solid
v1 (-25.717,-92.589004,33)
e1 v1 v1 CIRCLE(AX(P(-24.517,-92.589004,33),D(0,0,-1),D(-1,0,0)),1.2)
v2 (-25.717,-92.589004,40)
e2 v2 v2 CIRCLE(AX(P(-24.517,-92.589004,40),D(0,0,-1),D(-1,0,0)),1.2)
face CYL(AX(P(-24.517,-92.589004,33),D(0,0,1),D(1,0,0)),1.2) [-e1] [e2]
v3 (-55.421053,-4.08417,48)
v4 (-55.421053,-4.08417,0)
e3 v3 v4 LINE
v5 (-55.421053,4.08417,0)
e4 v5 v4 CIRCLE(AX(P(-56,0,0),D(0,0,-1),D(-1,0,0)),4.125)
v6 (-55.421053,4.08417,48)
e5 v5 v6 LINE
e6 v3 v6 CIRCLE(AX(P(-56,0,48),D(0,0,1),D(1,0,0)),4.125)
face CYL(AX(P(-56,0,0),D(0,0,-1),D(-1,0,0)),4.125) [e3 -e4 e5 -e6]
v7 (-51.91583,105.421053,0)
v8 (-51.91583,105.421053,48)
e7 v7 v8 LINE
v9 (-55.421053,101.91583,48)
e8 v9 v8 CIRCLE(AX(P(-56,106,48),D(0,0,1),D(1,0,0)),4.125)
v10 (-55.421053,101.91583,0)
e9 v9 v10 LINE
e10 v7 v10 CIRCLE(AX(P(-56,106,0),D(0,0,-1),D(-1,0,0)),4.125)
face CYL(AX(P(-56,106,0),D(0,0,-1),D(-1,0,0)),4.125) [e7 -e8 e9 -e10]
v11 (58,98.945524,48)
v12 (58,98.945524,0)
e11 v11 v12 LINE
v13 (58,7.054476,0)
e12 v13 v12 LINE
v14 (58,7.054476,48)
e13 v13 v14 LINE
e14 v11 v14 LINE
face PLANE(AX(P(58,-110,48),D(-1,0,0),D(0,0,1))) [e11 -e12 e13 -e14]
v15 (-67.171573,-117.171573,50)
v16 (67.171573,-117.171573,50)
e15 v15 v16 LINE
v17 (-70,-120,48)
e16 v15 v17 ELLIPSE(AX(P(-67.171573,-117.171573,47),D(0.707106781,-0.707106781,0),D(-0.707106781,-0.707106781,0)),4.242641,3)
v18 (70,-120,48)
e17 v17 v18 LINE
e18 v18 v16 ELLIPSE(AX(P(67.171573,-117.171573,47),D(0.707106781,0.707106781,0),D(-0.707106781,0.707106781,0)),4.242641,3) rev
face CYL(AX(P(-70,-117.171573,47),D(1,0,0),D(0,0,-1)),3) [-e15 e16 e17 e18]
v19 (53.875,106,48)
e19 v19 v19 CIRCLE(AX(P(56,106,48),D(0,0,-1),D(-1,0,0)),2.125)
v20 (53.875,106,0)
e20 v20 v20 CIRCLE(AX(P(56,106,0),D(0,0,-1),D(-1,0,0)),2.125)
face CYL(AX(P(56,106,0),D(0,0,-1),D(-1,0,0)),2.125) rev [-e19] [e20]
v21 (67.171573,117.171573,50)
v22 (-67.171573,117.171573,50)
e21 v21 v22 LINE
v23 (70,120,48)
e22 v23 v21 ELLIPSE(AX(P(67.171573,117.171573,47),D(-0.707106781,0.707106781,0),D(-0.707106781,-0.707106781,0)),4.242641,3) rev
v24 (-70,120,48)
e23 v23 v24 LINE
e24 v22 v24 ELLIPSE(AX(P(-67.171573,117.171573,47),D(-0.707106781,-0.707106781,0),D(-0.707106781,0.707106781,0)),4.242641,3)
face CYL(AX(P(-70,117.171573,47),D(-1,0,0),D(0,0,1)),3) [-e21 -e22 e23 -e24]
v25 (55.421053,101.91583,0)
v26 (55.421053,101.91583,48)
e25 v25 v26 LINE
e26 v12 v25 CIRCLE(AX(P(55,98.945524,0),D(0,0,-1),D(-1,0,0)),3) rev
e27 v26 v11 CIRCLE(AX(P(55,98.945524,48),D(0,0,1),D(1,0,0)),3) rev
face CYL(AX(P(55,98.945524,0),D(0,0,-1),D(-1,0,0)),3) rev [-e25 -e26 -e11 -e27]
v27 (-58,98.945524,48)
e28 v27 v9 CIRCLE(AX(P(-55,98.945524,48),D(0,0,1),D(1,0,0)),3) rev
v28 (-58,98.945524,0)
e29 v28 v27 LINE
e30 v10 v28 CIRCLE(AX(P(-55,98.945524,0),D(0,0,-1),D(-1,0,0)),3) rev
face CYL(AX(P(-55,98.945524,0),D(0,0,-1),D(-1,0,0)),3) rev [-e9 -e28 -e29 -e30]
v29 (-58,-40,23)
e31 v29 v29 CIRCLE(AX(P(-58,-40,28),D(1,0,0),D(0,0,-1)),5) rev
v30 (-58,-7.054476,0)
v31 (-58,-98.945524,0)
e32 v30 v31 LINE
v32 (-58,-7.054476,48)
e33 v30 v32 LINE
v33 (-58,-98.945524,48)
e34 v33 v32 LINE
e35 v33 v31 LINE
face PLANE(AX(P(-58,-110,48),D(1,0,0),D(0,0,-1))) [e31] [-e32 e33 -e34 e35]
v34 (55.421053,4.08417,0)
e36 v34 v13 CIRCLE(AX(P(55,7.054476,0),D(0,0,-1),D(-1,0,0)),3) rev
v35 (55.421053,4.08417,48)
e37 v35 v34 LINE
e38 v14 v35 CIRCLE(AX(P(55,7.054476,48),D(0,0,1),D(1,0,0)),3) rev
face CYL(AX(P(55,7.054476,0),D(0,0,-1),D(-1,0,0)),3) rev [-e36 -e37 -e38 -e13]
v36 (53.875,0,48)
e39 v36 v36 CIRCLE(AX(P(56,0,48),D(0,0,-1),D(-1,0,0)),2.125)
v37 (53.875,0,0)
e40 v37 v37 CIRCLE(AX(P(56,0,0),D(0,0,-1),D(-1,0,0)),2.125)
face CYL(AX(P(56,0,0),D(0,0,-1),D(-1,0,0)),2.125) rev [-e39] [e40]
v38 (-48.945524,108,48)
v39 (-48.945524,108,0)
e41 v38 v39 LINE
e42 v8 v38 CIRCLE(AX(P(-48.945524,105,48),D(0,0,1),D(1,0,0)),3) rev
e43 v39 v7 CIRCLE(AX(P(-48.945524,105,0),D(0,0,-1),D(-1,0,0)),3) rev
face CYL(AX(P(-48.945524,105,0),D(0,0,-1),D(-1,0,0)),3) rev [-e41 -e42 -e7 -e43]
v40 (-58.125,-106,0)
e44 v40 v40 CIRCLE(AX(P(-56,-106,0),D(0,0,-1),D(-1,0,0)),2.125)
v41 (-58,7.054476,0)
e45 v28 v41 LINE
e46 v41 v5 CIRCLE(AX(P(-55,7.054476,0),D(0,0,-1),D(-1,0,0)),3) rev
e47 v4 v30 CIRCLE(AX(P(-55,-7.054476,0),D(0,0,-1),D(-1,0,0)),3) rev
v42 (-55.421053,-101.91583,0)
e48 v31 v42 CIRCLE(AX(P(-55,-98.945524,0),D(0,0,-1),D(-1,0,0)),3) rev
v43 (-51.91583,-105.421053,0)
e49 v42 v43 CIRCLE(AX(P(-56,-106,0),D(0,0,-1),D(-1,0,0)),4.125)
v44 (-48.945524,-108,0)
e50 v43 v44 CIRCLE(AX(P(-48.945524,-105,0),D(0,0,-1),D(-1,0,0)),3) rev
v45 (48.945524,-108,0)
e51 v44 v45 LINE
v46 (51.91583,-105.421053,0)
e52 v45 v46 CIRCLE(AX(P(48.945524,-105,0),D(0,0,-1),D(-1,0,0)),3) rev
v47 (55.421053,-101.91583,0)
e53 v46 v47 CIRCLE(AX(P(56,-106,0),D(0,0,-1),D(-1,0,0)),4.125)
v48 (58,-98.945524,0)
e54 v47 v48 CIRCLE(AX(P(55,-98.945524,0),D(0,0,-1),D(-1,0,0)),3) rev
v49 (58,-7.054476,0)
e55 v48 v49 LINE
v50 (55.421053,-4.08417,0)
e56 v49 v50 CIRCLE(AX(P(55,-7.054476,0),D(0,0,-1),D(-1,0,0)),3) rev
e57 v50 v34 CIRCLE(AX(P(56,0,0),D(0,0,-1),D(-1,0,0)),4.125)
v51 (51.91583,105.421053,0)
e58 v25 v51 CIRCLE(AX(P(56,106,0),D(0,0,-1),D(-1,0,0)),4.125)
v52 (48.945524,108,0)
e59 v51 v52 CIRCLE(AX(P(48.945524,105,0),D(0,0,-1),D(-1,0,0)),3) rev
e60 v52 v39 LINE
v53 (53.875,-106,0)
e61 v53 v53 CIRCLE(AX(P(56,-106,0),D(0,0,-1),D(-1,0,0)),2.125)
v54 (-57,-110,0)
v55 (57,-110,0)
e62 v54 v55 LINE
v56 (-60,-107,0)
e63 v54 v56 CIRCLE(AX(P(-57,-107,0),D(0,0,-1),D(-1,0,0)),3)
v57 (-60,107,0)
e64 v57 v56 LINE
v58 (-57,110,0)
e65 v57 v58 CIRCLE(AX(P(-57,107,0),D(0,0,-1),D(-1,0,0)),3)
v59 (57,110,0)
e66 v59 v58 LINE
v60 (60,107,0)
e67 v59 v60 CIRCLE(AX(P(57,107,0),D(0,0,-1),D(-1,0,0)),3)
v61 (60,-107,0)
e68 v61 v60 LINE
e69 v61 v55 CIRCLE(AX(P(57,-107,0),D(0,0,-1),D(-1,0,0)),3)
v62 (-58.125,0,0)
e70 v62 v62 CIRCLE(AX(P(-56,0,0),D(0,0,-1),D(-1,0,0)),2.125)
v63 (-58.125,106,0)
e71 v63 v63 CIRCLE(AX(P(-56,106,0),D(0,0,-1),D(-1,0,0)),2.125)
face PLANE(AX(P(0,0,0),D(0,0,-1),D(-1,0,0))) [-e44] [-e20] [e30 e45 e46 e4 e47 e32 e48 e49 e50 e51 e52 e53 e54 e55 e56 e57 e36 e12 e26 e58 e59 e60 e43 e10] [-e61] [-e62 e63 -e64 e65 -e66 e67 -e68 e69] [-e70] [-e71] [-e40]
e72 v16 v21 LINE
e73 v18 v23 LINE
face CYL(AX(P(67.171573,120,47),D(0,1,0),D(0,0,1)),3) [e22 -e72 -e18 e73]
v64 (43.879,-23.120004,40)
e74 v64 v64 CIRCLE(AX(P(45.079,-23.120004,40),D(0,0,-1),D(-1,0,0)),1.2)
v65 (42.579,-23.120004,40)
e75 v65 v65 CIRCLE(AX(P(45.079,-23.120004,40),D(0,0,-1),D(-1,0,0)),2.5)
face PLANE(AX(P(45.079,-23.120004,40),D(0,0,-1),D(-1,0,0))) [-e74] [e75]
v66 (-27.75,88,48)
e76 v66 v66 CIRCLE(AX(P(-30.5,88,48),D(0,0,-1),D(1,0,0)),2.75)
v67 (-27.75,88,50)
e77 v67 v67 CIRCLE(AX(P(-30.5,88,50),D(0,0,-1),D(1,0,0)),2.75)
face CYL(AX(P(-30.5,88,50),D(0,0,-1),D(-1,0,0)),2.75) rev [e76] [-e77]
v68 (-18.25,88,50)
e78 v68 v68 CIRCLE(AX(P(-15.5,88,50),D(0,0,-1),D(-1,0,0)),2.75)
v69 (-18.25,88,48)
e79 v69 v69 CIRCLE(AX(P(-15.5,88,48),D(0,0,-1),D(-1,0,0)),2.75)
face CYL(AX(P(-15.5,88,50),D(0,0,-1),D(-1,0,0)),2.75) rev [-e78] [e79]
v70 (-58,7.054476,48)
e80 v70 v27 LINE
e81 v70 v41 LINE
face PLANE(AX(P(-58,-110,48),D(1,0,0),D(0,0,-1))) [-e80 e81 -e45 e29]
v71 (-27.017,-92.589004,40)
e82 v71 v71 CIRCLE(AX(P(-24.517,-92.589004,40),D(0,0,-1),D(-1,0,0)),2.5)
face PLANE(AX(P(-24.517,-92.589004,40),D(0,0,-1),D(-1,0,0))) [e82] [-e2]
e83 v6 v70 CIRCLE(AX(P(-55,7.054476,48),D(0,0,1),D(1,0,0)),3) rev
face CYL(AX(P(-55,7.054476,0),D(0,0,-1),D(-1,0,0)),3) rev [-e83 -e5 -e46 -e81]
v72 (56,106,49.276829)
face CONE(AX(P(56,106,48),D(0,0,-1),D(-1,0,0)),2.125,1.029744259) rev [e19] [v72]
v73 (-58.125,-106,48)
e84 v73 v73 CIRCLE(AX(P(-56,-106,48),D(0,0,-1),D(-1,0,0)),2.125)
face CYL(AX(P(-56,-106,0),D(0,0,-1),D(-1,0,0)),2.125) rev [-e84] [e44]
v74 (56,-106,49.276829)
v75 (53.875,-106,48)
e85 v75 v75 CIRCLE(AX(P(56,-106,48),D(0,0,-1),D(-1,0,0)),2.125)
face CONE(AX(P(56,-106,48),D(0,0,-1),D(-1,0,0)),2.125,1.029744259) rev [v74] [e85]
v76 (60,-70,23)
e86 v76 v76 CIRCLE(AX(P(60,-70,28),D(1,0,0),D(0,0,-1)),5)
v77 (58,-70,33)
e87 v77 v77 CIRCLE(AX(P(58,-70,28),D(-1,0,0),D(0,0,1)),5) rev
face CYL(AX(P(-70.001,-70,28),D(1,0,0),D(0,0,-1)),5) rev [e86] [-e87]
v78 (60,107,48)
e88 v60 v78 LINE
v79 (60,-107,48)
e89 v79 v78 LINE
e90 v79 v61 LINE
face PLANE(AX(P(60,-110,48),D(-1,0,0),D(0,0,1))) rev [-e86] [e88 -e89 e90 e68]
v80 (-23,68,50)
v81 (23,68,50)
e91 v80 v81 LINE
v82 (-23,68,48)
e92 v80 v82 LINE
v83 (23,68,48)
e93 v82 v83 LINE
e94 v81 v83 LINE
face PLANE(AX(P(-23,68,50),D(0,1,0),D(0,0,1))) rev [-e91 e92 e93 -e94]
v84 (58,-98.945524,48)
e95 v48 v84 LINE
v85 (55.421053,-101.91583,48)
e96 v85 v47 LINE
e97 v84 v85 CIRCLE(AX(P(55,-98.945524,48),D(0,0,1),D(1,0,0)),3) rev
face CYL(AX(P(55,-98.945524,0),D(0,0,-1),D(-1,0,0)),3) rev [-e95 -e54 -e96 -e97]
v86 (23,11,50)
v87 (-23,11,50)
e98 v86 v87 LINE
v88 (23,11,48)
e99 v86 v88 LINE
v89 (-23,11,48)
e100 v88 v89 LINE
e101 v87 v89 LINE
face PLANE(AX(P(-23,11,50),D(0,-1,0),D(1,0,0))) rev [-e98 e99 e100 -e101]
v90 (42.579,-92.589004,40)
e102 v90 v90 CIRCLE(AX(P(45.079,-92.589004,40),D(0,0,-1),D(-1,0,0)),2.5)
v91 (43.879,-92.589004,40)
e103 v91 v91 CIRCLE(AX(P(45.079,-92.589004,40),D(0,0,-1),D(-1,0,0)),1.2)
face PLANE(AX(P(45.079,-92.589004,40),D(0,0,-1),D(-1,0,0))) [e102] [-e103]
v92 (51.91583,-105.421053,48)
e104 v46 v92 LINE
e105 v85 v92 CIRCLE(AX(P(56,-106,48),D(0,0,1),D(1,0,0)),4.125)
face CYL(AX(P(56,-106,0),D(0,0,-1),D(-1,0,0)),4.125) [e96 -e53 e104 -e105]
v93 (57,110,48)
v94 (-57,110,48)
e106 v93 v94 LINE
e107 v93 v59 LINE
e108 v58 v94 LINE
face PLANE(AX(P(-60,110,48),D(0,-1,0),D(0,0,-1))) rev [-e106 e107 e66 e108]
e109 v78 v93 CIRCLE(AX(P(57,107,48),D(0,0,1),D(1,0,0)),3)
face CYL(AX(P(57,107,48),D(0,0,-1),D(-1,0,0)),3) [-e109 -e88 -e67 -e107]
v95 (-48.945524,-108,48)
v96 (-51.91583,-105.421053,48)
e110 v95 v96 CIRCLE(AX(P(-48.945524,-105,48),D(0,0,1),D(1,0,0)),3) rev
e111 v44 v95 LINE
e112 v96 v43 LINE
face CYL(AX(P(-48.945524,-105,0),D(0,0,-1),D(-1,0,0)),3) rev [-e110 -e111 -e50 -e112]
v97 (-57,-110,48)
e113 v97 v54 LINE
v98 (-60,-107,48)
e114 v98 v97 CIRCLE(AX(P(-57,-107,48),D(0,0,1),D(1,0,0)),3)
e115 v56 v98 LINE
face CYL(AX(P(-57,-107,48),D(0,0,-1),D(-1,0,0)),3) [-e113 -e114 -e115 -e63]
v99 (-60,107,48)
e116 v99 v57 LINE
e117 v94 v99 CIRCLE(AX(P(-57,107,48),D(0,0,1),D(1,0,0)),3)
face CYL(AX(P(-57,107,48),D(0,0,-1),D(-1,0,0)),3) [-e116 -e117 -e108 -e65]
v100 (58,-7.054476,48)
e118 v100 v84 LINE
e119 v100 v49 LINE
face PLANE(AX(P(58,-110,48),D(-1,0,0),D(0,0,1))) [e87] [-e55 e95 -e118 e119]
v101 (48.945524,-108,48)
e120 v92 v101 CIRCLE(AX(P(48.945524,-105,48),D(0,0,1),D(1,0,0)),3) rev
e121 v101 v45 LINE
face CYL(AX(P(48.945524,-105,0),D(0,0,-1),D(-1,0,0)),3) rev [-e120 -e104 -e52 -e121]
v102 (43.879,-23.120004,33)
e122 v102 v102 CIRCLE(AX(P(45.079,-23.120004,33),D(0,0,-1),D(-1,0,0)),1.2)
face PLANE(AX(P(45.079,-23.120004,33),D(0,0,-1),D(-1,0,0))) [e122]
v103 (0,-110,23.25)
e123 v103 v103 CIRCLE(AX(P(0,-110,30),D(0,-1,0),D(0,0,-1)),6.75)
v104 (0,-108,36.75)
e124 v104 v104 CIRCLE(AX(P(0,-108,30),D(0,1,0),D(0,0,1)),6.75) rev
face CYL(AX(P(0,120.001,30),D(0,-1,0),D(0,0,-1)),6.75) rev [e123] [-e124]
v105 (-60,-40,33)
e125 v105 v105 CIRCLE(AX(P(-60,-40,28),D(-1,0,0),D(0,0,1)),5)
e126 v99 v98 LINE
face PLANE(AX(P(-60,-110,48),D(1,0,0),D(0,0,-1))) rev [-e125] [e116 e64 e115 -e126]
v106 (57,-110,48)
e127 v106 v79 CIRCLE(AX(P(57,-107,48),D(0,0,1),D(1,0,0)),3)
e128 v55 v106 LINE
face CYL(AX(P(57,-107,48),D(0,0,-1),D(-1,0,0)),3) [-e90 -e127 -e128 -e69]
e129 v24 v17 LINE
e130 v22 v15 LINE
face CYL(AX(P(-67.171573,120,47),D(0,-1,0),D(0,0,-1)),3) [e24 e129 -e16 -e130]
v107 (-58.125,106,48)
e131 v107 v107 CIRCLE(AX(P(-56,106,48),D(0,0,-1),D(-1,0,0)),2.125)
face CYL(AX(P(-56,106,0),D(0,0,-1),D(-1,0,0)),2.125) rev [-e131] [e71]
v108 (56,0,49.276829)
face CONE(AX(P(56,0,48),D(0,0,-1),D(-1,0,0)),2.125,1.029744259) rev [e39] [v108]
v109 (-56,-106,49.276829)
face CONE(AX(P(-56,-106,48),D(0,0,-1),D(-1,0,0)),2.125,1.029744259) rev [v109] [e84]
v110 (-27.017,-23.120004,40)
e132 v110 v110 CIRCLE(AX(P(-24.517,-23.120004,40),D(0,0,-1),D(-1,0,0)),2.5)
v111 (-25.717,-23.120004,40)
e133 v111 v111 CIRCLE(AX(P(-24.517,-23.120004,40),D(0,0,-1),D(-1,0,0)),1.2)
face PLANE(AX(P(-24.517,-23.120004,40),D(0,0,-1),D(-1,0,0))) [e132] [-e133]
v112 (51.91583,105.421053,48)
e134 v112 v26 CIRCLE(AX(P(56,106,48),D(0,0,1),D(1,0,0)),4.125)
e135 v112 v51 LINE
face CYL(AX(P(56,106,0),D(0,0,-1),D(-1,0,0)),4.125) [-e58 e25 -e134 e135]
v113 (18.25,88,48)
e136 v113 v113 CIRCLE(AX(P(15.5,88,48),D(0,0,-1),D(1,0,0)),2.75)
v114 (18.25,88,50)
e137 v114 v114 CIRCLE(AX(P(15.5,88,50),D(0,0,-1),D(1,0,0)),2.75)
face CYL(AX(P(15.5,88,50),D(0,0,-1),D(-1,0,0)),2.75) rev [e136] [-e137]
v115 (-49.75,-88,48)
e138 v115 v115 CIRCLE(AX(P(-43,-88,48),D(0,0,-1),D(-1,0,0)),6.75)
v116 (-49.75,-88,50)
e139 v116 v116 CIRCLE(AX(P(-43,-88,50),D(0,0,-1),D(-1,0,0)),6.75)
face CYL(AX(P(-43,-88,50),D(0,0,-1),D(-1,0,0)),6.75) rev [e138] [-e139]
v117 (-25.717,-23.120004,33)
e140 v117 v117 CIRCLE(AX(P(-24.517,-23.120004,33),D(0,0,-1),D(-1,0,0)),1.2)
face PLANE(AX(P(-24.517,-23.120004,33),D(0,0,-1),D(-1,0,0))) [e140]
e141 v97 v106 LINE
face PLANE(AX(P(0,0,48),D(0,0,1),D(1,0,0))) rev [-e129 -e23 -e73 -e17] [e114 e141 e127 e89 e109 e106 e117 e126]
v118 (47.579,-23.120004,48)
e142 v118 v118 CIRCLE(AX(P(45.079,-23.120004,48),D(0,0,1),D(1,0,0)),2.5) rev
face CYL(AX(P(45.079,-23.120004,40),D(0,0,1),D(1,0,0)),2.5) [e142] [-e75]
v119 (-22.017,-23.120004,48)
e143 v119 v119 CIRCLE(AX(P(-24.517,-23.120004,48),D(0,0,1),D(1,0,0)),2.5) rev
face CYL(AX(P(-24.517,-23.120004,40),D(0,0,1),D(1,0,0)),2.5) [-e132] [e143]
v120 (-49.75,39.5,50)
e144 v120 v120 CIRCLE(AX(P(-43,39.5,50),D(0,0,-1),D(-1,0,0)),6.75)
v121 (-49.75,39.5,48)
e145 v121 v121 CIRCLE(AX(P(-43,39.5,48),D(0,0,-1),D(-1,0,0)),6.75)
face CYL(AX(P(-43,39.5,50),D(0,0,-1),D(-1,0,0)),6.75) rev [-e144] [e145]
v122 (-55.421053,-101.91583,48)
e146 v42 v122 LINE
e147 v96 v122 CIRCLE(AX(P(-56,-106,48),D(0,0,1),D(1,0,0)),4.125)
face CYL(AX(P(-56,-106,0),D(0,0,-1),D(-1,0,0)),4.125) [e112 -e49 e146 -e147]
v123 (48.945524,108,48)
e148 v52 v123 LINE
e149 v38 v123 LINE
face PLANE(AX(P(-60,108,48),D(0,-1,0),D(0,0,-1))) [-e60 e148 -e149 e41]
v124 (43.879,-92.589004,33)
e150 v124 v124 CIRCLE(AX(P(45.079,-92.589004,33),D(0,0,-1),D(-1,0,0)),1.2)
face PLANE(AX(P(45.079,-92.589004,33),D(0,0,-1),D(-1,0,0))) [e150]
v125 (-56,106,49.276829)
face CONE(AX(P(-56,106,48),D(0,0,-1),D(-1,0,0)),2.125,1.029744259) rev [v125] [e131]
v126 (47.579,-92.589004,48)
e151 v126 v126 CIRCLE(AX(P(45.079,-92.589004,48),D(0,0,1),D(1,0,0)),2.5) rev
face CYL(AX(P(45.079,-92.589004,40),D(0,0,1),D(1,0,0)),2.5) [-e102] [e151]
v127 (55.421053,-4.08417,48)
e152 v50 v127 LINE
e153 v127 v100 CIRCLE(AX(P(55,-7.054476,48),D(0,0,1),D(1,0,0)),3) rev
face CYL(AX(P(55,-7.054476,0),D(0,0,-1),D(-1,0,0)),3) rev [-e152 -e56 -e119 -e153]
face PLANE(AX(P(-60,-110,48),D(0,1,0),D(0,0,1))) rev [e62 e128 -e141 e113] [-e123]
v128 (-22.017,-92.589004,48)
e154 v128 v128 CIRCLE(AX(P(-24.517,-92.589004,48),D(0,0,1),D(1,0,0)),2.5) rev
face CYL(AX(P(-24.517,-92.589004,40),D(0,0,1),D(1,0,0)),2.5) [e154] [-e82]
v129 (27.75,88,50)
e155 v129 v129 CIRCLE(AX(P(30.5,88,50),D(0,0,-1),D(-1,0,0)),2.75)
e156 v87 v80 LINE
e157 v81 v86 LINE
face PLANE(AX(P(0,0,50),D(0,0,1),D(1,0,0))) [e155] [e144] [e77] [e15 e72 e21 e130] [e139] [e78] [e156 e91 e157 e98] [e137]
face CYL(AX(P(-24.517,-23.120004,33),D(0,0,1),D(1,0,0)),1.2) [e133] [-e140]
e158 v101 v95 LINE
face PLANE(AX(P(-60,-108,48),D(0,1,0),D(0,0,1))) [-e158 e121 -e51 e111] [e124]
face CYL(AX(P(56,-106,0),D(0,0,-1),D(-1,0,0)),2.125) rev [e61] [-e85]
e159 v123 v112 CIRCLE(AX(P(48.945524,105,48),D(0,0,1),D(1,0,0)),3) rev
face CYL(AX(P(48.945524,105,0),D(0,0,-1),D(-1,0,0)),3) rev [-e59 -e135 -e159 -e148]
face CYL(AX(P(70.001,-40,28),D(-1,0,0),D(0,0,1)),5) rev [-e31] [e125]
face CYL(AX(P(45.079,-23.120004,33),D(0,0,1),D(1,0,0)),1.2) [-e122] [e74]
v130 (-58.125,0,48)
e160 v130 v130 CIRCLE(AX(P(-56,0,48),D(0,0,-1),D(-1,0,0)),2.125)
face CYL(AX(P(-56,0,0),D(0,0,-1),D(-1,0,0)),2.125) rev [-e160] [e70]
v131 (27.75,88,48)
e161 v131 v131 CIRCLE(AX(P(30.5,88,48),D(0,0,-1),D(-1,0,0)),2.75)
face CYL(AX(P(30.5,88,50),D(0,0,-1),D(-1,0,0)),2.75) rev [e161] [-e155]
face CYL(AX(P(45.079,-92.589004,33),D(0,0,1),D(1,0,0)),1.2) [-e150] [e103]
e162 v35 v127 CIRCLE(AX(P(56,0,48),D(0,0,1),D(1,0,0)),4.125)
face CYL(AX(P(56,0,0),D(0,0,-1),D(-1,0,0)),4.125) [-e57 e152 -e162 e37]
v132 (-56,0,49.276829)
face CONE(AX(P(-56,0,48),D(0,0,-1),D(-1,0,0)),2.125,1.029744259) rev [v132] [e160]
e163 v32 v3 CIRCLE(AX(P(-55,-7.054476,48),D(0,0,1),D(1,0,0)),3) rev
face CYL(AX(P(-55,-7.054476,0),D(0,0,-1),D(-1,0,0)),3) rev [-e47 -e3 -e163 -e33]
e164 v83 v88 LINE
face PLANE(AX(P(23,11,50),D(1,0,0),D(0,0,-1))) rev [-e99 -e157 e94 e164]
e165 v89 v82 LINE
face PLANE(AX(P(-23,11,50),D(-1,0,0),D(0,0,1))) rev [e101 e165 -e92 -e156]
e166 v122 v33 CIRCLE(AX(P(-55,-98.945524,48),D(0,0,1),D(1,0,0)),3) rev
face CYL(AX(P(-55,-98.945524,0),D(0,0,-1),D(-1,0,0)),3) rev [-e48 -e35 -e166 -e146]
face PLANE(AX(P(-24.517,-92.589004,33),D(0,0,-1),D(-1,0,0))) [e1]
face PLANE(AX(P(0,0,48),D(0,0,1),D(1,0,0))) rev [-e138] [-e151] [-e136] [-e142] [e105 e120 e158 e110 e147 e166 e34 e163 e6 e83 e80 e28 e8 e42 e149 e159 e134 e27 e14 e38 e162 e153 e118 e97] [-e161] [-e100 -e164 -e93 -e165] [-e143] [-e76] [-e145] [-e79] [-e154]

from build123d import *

# Parameters (mm, degrees)
SKETCH1_W           = 120
SKETCH1_H           = 220
BOSS_EXTRUDE1_DEPTH = 48
SKETCH2_W           = 140
SKETCH2_H           = 240
BOSS_EXTRUDE2_DEPTH = 2
SHELL3_DEPTH        = 48
FILLET1_R           = 3
SKETCH4_R           = 2.75
SKETCH4_R_2         = 6.75
SKETCH4_W           = 46
SKETCH4_H           = 57
CUT_EXTRUDE1_DEPTH  = 147.982992213
SKETCH6_R           = 1.2
BOSS_EXTRUDE3_DEPTH = 15
SKETCH7_R           = 2.5
BOSS_EXTRUDE4_DEPTH = 8
CUT_EXTRUDE2_REACH  = 185.848
SKETCH9_R           = 5
CUT_EXTRUDE3_REACH  = 185.848
SKETCH10_R          = 5
CUT_EXTRUDE4_REACH  = 247.561
SKETCH11_R          = 6.75
FILLET2_R           = 3
FILLET3_R           = 3


# Read off the part's stored shape, not the designer's step: Ø3.0mm Dowel Hole1, Shell3
with BuildPart() as part:
    # Sketch1 → Boss-Extrude1 (new body)
    with BuildSketch(Plane.XY):
        Rectangle(SKETCH1_W, SKETCH1_H)
    extrude(amount=BOSS_EXTRUDE1_DEPTH)

    # Sketch2 → Boss-Extrude2 (add)
    with BuildSketch(Plane.XY.offset(48)):
        Rectangle(SKETCH2_W, SKETCH2_H)
    extrude(amount=BOSS_EXTRUDE2_DEPTH)

    # Ø3.0mm Dowel Hole1 outline → Ø3.0mm Dowel Hole1 (revolve, cut)
    with BuildSketch(Plane(origin=(-56, 0, 0), x_dir=(1, 0, 0), z_dir=(0, -1, 0))):
        Polygon((2.125, 48), (0, 49.276828815), (0, 0), (2.125, 0), align=None)
    revolve(axis=Axis((-56, 0, 0), (0, 0, 1)), mode=Mode.SUBTRACT)

    # 3.0mm Dowel Hole1 2 outline → 3.0mm Dowel Hole1 2 (revolve, cut)
    with BuildSketch(Plane(origin=(56, 0, 0), x_dir=(1, 0, 0), z_dir=(0, -1, 0))):
        Polygon((2.125, 48), (0, 49.276828815), (0, 0), (2.125, 0), align=None)
    revolve(axis=Axis((56, 0, 0), (0, 0, 1)), mode=Mode.SUBTRACT)

    # 3.0mm Dowel Hole1 3 outline → 3.0mm Dowel Hole1 3 (revolve, cut)
    with BuildSketch(Plane(origin=(-56, -106, 0), x_dir=(1, 0, 0), z_dir=(0, -1, 0))):
        Polygon((2.125, 48), (0, 49.276828815), (0, 0), (2.125, 0), align=None)
    revolve(axis=Axis((-56, -106, 0), (0, 0, 1)), mode=Mode.SUBTRACT)

    # 3.0mm Dowel Hole1 4 outline → 3.0mm Dowel Hole1 4 (revolve, cut)
    with BuildSketch(Plane(origin=(56, -106, 0), x_dir=(1, 0, 0), z_dir=(0, -1, 0))):
        Polygon((2.125, 48), (0, 49.276828815), (0, 0), (2.125, 0), align=None)
    revolve(axis=Axis((56, -106, 0), (0, 0, 1)), mode=Mode.SUBTRACT)

    # 3.0mm Dowel Hole1 5 outline → 3.0mm Dowel Hole1 5 (revolve, cut)
    with BuildSketch(Plane(origin=(-56, 106, 0), x_dir=(1, 0, 0), z_dir=(0, -1, 0))):
        Polygon((2.125, 48), (0, 49.276828815), (0, 0), (2.125, 0), align=None)
    revolve(axis=Axis((-56, 106, 0), (0, 0, 1)), mode=Mode.SUBTRACT)

    # 3.0mm Dowel Hole1 6 outline → 3.0mm Dowel Hole1 6 (revolve, cut)
    with BuildSketch(Plane(origin=(56, 106, 0), x_dir=(1, 0, 0), z_dir=(0, -1, 0))):
        Polygon((2.125, 48), (0, 49.276828815), (0, 0), (2.125, 0), align=None)
    revolve(axis=Axis((56, 106, 0), (0, 0, 1)), mode=Mode.SUBTRACT)

    # Shell3 outline → Shell3 (cut)
    with BuildSketch(Plane.XY):
        with BuildLine():
            Line((52.392282578, 108), (-52.392282578, 108))
            ThreePointArc((-52.392282578, 108), (-53.083184528, 103.083184528), (-58, 102.392282578))
            Line((-58, 102.392282578), (-58, 3.607717422))
            ThreePointArc((-58, 3.607717422), (-51.875, 0), (-58, -3.607717422))
            Line((-58, -3.607717422), (-58, -102.392282578))
            ThreePointArc((-58, -102.392282578), (-53.083184528, -103.083184528), (-52.392282578, -108))
            Line((-52.392282578, -108), (52.392282578, -108))
            ThreePointArc((52.392282578, -108), (53.083184528, -103.083184528), (58, -102.392282578))
            Line((58, -102.392282578), (58, -3.607717422))
            ThreePointArc((58, -3.607717422), (51.875, 0), (58, 3.607717422))
            Line((58, 3.607717422), (58, 102.392282578))
            ThreePointArc((58, 102.392282578), (53.083184528, 103.083184528), (52.392282578, 108))
        make_face()
    extrude(amount=SHELL3_DEPTH, mode=Mode.SUBTRACT)

    # Fillet1
    fillet1_edges = [part.edges().sort_by_distance(p)[0] for p in [
        (-52.392282578, 108, 24),
        (-58, 3.607717422, 24),
        (58, -3.607717422, 24),
        (52.392282578, -108, 24),
        (58, 102.392282578, 24),
        (-58, -102.392282578, 24),
        (-58, -3.607717422, 24),
        (58, 3.607717422, 24),
        (-52.392282578, -108, 24),
        (58, -102.392282578, 24),
        (-58, 102.392282578, 24),
        (52.392282578, 108, 24),
    ]]
    fillet(fillet1_edges, radius=FILLET1_R)

    # Sketch4 → Cut-Extrude1 (cut, through all)
    with BuildSketch(Plane(origin=(0, 0, 48), x_dir=(-1, 0, 0), z_dir=(0, 0, -1))):
        with Locations((15.5, 88)):
            Circle(SKETCH4_R)
        with Locations(Location((30.5, 88, 0), (0, 0, 180))):
            Circle(SKETCH4_R)
        with Locations((-30.5, 88)):
            Circle(SKETCH4_R)
        with Locations(Location((-15.5, 88, 0), (0, 0, 180))):
            Circle(SKETCH4_R)
        with Locations((43, 39.5)):
            Circle(SKETCH4_R_2)
        with Locations((43, -88)):
            Circle(SKETCH4_R_2)
        with Locations((0, 39.5)):
            Rectangle(SKETCH4_W, SKETCH4_H)
    extrude(amount=-CUT_EXTRUDE1_DEPTH, mode=Mode.SUBTRACT)

    # Sketch6 → Boss-Extrude3 (add)
    with BuildSketch(Plane(origin=(0, 0, 48), x_dir=(-1, 0, 0), z_dir=(0, 0, -1))):
        with Locations(Location((-45.079, -23.120003999, 0), (0, 0, 180))):
            Circle(SKETCH6_R)
        with Locations(Location((24.517, -23.120003999, 0), (0, 0, 180))):
            Circle(SKETCH6_R)
        with Locations(Location((-45.079, -92.589003999, 0), (0, 0, 180))):
            Circle(SKETCH6_R)
        with Locations(Location((24.517, -92.589003999, 0), (0, 0, 180))):
            Circle(SKETCH6_R)
    extrude(amount=BOSS_EXTRUDE3_DEPTH)

    # Sketch7 → Boss-Extrude4 (add)
    with BuildSketch(Plane(origin=(0, 0, 48), x_dir=(-1, 0, 0), z_dir=(0, 0, -1))):
        with Locations(Location((-45.079, -23.120003999, 0), (0, 0, 180))):
            Circle(SKETCH7_R)
        with Locations(Location((24.517, -23.120003999, 0), (0, 0, 180))):
            Circle(SKETCH7_R)
        with Locations(Location((24.517, -92.589003999, 0), (0, 0, 180))):
            Circle(SKETCH7_R)
        with Locations(Location((-45.079, -92.589003999, 0), (0, 0, 180))):
            Circle(SKETCH7_R)
    extrude(amount=BOSS_EXTRUDE4_DEPTH)

    # Sketch9 → Cut-Extrude2 (cut, up to next)
    with BuildSketch(Plane(origin=(60, 0, 0), x_dir=(0, 0, -1), z_dir=(1, 0, 0)), mode=Mode.PRIVATE) as cut_extrude2_sk1:
        with Locations((-28, -70)):
            Circle(SKETCH9_R)
    cut_extrude2_tool1 = extrude(cut_extrude2_sk1.sketch, amount=-CUT_EXTRUDE2_REACH, mode=Mode.PRIVATE) & part.part
    add(cut_extrude2_tool1.solids().sort_by_distance((60, -70, 28))[0], mode=Mode.SUBTRACT)

    # Sketch10 → Cut-Extrude3 (cut, up to next)
    with BuildSketch(Plane.ZY.offset(60), mode=Mode.PRIVATE) as cut_extrude3_sk1:
        with Locations((28, -40)):
            Circle(SKETCH10_R)
    cut_extrude3_tool1 = extrude(cut_extrude3_sk1.sketch, amount=-CUT_EXTRUDE3_REACH, mode=Mode.PRIVATE) & part.part
    add(cut_extrude3_tool1.solids().sort_by_distance((-60, -40, 28))[0], mode=Mode.SUBTRACT)

    # Sketch11 → Cut-Extrude4 (cut, up to next)
    with BuildSketch(Plane.XZ.offset(110), mode=Mode.PRIVATE) as cut_extrude4_sk1:
        with Locations(Location((0, 30, 0), (0, 0, 270))):
            Circle(SKETCH11_R)
    cut_extrude4_tool1 = extrude(cut_extrude4_sk1.sketch, amount=-CUT_EXTRUDE4_REACH, mode=Mode.PRIVATE) & part.part
    add(cut_extrude4_tool1.solids().sort_by_distance((0, -110, 30))[0], mode=Mode.SUBTRACT)

    # Fillet2
    fillet2_edges = [part.edges().sort_by_distance(p)[0] for p in [
        (60, -110, 24),
        (-60, -110, 24),
        (-60, 110, 24),
        (60, 110, 24),
    ]]
    fillet(fillet2_edges, radius=FILLET2_R)

    # Fillet3
    # the kernel refuses this fillet: 3 mm, written as the material it takes off along each edge
    with BuildSketch(Plane(origin=(77.071067812, -120, 50), x_dir=(0, 0, -1), z_dir=(-1, 0, 0)), Plane(origin=(-77.071067812, 120, 50), x_dir=(0, 0, -1), z_dir=(1, 0, 0))) as fillet3_piece_1:
        with BuildLine():
            CenterArc((3, -2.828427125), FILLET3_R, 109.471220634, 70.528779366)
            Line((0, -2.828427125), (-0.06, -2.828427125))
            Line((-0.06, -2.828427125), (-0.06, 0))
            Line((-0.06, 0), (0, 0.06))
            ThreePointArc((0, 0.06), (1, 0.06), (1.98, 0.056568542))
            Line((1.98, 0.056568542), (2, 0))
        make_face()
    extrude(amount=154.142135624, mode=Mode.SUBTRACT)
    with BuildSketch(Plane(origin=(-70, -127.071067812, 50), x_dir=(0, 0, -1), z_dir=(0, 1, 0)), Plane(origin=(70, 127.071067812, 50), x_dir=(0, 0, -1), z_dir=(0, -1, 0))) as fillet3_piece_2:
        with BuildLine():
            CenterArc((3, -2.828427125), FILLET3_R, 109.471220634, 70.528779366)
            Line((0, -2.828427125), (-0.06, -2.828427125))
            Line((-0.06, -2.828427125), (-0.06, 0))
            Line((-0.06, 0), (0, 0.06))
            ThreePointArc((0, 0.06), (1, 0.06), (1.98, 0.056568542))
            Line((1.98, 0.056568542), (2, 0))
        make_face()
    extrude(amount=254.142135624, mode=Mode.SUBTRACT)


solid = part.part
